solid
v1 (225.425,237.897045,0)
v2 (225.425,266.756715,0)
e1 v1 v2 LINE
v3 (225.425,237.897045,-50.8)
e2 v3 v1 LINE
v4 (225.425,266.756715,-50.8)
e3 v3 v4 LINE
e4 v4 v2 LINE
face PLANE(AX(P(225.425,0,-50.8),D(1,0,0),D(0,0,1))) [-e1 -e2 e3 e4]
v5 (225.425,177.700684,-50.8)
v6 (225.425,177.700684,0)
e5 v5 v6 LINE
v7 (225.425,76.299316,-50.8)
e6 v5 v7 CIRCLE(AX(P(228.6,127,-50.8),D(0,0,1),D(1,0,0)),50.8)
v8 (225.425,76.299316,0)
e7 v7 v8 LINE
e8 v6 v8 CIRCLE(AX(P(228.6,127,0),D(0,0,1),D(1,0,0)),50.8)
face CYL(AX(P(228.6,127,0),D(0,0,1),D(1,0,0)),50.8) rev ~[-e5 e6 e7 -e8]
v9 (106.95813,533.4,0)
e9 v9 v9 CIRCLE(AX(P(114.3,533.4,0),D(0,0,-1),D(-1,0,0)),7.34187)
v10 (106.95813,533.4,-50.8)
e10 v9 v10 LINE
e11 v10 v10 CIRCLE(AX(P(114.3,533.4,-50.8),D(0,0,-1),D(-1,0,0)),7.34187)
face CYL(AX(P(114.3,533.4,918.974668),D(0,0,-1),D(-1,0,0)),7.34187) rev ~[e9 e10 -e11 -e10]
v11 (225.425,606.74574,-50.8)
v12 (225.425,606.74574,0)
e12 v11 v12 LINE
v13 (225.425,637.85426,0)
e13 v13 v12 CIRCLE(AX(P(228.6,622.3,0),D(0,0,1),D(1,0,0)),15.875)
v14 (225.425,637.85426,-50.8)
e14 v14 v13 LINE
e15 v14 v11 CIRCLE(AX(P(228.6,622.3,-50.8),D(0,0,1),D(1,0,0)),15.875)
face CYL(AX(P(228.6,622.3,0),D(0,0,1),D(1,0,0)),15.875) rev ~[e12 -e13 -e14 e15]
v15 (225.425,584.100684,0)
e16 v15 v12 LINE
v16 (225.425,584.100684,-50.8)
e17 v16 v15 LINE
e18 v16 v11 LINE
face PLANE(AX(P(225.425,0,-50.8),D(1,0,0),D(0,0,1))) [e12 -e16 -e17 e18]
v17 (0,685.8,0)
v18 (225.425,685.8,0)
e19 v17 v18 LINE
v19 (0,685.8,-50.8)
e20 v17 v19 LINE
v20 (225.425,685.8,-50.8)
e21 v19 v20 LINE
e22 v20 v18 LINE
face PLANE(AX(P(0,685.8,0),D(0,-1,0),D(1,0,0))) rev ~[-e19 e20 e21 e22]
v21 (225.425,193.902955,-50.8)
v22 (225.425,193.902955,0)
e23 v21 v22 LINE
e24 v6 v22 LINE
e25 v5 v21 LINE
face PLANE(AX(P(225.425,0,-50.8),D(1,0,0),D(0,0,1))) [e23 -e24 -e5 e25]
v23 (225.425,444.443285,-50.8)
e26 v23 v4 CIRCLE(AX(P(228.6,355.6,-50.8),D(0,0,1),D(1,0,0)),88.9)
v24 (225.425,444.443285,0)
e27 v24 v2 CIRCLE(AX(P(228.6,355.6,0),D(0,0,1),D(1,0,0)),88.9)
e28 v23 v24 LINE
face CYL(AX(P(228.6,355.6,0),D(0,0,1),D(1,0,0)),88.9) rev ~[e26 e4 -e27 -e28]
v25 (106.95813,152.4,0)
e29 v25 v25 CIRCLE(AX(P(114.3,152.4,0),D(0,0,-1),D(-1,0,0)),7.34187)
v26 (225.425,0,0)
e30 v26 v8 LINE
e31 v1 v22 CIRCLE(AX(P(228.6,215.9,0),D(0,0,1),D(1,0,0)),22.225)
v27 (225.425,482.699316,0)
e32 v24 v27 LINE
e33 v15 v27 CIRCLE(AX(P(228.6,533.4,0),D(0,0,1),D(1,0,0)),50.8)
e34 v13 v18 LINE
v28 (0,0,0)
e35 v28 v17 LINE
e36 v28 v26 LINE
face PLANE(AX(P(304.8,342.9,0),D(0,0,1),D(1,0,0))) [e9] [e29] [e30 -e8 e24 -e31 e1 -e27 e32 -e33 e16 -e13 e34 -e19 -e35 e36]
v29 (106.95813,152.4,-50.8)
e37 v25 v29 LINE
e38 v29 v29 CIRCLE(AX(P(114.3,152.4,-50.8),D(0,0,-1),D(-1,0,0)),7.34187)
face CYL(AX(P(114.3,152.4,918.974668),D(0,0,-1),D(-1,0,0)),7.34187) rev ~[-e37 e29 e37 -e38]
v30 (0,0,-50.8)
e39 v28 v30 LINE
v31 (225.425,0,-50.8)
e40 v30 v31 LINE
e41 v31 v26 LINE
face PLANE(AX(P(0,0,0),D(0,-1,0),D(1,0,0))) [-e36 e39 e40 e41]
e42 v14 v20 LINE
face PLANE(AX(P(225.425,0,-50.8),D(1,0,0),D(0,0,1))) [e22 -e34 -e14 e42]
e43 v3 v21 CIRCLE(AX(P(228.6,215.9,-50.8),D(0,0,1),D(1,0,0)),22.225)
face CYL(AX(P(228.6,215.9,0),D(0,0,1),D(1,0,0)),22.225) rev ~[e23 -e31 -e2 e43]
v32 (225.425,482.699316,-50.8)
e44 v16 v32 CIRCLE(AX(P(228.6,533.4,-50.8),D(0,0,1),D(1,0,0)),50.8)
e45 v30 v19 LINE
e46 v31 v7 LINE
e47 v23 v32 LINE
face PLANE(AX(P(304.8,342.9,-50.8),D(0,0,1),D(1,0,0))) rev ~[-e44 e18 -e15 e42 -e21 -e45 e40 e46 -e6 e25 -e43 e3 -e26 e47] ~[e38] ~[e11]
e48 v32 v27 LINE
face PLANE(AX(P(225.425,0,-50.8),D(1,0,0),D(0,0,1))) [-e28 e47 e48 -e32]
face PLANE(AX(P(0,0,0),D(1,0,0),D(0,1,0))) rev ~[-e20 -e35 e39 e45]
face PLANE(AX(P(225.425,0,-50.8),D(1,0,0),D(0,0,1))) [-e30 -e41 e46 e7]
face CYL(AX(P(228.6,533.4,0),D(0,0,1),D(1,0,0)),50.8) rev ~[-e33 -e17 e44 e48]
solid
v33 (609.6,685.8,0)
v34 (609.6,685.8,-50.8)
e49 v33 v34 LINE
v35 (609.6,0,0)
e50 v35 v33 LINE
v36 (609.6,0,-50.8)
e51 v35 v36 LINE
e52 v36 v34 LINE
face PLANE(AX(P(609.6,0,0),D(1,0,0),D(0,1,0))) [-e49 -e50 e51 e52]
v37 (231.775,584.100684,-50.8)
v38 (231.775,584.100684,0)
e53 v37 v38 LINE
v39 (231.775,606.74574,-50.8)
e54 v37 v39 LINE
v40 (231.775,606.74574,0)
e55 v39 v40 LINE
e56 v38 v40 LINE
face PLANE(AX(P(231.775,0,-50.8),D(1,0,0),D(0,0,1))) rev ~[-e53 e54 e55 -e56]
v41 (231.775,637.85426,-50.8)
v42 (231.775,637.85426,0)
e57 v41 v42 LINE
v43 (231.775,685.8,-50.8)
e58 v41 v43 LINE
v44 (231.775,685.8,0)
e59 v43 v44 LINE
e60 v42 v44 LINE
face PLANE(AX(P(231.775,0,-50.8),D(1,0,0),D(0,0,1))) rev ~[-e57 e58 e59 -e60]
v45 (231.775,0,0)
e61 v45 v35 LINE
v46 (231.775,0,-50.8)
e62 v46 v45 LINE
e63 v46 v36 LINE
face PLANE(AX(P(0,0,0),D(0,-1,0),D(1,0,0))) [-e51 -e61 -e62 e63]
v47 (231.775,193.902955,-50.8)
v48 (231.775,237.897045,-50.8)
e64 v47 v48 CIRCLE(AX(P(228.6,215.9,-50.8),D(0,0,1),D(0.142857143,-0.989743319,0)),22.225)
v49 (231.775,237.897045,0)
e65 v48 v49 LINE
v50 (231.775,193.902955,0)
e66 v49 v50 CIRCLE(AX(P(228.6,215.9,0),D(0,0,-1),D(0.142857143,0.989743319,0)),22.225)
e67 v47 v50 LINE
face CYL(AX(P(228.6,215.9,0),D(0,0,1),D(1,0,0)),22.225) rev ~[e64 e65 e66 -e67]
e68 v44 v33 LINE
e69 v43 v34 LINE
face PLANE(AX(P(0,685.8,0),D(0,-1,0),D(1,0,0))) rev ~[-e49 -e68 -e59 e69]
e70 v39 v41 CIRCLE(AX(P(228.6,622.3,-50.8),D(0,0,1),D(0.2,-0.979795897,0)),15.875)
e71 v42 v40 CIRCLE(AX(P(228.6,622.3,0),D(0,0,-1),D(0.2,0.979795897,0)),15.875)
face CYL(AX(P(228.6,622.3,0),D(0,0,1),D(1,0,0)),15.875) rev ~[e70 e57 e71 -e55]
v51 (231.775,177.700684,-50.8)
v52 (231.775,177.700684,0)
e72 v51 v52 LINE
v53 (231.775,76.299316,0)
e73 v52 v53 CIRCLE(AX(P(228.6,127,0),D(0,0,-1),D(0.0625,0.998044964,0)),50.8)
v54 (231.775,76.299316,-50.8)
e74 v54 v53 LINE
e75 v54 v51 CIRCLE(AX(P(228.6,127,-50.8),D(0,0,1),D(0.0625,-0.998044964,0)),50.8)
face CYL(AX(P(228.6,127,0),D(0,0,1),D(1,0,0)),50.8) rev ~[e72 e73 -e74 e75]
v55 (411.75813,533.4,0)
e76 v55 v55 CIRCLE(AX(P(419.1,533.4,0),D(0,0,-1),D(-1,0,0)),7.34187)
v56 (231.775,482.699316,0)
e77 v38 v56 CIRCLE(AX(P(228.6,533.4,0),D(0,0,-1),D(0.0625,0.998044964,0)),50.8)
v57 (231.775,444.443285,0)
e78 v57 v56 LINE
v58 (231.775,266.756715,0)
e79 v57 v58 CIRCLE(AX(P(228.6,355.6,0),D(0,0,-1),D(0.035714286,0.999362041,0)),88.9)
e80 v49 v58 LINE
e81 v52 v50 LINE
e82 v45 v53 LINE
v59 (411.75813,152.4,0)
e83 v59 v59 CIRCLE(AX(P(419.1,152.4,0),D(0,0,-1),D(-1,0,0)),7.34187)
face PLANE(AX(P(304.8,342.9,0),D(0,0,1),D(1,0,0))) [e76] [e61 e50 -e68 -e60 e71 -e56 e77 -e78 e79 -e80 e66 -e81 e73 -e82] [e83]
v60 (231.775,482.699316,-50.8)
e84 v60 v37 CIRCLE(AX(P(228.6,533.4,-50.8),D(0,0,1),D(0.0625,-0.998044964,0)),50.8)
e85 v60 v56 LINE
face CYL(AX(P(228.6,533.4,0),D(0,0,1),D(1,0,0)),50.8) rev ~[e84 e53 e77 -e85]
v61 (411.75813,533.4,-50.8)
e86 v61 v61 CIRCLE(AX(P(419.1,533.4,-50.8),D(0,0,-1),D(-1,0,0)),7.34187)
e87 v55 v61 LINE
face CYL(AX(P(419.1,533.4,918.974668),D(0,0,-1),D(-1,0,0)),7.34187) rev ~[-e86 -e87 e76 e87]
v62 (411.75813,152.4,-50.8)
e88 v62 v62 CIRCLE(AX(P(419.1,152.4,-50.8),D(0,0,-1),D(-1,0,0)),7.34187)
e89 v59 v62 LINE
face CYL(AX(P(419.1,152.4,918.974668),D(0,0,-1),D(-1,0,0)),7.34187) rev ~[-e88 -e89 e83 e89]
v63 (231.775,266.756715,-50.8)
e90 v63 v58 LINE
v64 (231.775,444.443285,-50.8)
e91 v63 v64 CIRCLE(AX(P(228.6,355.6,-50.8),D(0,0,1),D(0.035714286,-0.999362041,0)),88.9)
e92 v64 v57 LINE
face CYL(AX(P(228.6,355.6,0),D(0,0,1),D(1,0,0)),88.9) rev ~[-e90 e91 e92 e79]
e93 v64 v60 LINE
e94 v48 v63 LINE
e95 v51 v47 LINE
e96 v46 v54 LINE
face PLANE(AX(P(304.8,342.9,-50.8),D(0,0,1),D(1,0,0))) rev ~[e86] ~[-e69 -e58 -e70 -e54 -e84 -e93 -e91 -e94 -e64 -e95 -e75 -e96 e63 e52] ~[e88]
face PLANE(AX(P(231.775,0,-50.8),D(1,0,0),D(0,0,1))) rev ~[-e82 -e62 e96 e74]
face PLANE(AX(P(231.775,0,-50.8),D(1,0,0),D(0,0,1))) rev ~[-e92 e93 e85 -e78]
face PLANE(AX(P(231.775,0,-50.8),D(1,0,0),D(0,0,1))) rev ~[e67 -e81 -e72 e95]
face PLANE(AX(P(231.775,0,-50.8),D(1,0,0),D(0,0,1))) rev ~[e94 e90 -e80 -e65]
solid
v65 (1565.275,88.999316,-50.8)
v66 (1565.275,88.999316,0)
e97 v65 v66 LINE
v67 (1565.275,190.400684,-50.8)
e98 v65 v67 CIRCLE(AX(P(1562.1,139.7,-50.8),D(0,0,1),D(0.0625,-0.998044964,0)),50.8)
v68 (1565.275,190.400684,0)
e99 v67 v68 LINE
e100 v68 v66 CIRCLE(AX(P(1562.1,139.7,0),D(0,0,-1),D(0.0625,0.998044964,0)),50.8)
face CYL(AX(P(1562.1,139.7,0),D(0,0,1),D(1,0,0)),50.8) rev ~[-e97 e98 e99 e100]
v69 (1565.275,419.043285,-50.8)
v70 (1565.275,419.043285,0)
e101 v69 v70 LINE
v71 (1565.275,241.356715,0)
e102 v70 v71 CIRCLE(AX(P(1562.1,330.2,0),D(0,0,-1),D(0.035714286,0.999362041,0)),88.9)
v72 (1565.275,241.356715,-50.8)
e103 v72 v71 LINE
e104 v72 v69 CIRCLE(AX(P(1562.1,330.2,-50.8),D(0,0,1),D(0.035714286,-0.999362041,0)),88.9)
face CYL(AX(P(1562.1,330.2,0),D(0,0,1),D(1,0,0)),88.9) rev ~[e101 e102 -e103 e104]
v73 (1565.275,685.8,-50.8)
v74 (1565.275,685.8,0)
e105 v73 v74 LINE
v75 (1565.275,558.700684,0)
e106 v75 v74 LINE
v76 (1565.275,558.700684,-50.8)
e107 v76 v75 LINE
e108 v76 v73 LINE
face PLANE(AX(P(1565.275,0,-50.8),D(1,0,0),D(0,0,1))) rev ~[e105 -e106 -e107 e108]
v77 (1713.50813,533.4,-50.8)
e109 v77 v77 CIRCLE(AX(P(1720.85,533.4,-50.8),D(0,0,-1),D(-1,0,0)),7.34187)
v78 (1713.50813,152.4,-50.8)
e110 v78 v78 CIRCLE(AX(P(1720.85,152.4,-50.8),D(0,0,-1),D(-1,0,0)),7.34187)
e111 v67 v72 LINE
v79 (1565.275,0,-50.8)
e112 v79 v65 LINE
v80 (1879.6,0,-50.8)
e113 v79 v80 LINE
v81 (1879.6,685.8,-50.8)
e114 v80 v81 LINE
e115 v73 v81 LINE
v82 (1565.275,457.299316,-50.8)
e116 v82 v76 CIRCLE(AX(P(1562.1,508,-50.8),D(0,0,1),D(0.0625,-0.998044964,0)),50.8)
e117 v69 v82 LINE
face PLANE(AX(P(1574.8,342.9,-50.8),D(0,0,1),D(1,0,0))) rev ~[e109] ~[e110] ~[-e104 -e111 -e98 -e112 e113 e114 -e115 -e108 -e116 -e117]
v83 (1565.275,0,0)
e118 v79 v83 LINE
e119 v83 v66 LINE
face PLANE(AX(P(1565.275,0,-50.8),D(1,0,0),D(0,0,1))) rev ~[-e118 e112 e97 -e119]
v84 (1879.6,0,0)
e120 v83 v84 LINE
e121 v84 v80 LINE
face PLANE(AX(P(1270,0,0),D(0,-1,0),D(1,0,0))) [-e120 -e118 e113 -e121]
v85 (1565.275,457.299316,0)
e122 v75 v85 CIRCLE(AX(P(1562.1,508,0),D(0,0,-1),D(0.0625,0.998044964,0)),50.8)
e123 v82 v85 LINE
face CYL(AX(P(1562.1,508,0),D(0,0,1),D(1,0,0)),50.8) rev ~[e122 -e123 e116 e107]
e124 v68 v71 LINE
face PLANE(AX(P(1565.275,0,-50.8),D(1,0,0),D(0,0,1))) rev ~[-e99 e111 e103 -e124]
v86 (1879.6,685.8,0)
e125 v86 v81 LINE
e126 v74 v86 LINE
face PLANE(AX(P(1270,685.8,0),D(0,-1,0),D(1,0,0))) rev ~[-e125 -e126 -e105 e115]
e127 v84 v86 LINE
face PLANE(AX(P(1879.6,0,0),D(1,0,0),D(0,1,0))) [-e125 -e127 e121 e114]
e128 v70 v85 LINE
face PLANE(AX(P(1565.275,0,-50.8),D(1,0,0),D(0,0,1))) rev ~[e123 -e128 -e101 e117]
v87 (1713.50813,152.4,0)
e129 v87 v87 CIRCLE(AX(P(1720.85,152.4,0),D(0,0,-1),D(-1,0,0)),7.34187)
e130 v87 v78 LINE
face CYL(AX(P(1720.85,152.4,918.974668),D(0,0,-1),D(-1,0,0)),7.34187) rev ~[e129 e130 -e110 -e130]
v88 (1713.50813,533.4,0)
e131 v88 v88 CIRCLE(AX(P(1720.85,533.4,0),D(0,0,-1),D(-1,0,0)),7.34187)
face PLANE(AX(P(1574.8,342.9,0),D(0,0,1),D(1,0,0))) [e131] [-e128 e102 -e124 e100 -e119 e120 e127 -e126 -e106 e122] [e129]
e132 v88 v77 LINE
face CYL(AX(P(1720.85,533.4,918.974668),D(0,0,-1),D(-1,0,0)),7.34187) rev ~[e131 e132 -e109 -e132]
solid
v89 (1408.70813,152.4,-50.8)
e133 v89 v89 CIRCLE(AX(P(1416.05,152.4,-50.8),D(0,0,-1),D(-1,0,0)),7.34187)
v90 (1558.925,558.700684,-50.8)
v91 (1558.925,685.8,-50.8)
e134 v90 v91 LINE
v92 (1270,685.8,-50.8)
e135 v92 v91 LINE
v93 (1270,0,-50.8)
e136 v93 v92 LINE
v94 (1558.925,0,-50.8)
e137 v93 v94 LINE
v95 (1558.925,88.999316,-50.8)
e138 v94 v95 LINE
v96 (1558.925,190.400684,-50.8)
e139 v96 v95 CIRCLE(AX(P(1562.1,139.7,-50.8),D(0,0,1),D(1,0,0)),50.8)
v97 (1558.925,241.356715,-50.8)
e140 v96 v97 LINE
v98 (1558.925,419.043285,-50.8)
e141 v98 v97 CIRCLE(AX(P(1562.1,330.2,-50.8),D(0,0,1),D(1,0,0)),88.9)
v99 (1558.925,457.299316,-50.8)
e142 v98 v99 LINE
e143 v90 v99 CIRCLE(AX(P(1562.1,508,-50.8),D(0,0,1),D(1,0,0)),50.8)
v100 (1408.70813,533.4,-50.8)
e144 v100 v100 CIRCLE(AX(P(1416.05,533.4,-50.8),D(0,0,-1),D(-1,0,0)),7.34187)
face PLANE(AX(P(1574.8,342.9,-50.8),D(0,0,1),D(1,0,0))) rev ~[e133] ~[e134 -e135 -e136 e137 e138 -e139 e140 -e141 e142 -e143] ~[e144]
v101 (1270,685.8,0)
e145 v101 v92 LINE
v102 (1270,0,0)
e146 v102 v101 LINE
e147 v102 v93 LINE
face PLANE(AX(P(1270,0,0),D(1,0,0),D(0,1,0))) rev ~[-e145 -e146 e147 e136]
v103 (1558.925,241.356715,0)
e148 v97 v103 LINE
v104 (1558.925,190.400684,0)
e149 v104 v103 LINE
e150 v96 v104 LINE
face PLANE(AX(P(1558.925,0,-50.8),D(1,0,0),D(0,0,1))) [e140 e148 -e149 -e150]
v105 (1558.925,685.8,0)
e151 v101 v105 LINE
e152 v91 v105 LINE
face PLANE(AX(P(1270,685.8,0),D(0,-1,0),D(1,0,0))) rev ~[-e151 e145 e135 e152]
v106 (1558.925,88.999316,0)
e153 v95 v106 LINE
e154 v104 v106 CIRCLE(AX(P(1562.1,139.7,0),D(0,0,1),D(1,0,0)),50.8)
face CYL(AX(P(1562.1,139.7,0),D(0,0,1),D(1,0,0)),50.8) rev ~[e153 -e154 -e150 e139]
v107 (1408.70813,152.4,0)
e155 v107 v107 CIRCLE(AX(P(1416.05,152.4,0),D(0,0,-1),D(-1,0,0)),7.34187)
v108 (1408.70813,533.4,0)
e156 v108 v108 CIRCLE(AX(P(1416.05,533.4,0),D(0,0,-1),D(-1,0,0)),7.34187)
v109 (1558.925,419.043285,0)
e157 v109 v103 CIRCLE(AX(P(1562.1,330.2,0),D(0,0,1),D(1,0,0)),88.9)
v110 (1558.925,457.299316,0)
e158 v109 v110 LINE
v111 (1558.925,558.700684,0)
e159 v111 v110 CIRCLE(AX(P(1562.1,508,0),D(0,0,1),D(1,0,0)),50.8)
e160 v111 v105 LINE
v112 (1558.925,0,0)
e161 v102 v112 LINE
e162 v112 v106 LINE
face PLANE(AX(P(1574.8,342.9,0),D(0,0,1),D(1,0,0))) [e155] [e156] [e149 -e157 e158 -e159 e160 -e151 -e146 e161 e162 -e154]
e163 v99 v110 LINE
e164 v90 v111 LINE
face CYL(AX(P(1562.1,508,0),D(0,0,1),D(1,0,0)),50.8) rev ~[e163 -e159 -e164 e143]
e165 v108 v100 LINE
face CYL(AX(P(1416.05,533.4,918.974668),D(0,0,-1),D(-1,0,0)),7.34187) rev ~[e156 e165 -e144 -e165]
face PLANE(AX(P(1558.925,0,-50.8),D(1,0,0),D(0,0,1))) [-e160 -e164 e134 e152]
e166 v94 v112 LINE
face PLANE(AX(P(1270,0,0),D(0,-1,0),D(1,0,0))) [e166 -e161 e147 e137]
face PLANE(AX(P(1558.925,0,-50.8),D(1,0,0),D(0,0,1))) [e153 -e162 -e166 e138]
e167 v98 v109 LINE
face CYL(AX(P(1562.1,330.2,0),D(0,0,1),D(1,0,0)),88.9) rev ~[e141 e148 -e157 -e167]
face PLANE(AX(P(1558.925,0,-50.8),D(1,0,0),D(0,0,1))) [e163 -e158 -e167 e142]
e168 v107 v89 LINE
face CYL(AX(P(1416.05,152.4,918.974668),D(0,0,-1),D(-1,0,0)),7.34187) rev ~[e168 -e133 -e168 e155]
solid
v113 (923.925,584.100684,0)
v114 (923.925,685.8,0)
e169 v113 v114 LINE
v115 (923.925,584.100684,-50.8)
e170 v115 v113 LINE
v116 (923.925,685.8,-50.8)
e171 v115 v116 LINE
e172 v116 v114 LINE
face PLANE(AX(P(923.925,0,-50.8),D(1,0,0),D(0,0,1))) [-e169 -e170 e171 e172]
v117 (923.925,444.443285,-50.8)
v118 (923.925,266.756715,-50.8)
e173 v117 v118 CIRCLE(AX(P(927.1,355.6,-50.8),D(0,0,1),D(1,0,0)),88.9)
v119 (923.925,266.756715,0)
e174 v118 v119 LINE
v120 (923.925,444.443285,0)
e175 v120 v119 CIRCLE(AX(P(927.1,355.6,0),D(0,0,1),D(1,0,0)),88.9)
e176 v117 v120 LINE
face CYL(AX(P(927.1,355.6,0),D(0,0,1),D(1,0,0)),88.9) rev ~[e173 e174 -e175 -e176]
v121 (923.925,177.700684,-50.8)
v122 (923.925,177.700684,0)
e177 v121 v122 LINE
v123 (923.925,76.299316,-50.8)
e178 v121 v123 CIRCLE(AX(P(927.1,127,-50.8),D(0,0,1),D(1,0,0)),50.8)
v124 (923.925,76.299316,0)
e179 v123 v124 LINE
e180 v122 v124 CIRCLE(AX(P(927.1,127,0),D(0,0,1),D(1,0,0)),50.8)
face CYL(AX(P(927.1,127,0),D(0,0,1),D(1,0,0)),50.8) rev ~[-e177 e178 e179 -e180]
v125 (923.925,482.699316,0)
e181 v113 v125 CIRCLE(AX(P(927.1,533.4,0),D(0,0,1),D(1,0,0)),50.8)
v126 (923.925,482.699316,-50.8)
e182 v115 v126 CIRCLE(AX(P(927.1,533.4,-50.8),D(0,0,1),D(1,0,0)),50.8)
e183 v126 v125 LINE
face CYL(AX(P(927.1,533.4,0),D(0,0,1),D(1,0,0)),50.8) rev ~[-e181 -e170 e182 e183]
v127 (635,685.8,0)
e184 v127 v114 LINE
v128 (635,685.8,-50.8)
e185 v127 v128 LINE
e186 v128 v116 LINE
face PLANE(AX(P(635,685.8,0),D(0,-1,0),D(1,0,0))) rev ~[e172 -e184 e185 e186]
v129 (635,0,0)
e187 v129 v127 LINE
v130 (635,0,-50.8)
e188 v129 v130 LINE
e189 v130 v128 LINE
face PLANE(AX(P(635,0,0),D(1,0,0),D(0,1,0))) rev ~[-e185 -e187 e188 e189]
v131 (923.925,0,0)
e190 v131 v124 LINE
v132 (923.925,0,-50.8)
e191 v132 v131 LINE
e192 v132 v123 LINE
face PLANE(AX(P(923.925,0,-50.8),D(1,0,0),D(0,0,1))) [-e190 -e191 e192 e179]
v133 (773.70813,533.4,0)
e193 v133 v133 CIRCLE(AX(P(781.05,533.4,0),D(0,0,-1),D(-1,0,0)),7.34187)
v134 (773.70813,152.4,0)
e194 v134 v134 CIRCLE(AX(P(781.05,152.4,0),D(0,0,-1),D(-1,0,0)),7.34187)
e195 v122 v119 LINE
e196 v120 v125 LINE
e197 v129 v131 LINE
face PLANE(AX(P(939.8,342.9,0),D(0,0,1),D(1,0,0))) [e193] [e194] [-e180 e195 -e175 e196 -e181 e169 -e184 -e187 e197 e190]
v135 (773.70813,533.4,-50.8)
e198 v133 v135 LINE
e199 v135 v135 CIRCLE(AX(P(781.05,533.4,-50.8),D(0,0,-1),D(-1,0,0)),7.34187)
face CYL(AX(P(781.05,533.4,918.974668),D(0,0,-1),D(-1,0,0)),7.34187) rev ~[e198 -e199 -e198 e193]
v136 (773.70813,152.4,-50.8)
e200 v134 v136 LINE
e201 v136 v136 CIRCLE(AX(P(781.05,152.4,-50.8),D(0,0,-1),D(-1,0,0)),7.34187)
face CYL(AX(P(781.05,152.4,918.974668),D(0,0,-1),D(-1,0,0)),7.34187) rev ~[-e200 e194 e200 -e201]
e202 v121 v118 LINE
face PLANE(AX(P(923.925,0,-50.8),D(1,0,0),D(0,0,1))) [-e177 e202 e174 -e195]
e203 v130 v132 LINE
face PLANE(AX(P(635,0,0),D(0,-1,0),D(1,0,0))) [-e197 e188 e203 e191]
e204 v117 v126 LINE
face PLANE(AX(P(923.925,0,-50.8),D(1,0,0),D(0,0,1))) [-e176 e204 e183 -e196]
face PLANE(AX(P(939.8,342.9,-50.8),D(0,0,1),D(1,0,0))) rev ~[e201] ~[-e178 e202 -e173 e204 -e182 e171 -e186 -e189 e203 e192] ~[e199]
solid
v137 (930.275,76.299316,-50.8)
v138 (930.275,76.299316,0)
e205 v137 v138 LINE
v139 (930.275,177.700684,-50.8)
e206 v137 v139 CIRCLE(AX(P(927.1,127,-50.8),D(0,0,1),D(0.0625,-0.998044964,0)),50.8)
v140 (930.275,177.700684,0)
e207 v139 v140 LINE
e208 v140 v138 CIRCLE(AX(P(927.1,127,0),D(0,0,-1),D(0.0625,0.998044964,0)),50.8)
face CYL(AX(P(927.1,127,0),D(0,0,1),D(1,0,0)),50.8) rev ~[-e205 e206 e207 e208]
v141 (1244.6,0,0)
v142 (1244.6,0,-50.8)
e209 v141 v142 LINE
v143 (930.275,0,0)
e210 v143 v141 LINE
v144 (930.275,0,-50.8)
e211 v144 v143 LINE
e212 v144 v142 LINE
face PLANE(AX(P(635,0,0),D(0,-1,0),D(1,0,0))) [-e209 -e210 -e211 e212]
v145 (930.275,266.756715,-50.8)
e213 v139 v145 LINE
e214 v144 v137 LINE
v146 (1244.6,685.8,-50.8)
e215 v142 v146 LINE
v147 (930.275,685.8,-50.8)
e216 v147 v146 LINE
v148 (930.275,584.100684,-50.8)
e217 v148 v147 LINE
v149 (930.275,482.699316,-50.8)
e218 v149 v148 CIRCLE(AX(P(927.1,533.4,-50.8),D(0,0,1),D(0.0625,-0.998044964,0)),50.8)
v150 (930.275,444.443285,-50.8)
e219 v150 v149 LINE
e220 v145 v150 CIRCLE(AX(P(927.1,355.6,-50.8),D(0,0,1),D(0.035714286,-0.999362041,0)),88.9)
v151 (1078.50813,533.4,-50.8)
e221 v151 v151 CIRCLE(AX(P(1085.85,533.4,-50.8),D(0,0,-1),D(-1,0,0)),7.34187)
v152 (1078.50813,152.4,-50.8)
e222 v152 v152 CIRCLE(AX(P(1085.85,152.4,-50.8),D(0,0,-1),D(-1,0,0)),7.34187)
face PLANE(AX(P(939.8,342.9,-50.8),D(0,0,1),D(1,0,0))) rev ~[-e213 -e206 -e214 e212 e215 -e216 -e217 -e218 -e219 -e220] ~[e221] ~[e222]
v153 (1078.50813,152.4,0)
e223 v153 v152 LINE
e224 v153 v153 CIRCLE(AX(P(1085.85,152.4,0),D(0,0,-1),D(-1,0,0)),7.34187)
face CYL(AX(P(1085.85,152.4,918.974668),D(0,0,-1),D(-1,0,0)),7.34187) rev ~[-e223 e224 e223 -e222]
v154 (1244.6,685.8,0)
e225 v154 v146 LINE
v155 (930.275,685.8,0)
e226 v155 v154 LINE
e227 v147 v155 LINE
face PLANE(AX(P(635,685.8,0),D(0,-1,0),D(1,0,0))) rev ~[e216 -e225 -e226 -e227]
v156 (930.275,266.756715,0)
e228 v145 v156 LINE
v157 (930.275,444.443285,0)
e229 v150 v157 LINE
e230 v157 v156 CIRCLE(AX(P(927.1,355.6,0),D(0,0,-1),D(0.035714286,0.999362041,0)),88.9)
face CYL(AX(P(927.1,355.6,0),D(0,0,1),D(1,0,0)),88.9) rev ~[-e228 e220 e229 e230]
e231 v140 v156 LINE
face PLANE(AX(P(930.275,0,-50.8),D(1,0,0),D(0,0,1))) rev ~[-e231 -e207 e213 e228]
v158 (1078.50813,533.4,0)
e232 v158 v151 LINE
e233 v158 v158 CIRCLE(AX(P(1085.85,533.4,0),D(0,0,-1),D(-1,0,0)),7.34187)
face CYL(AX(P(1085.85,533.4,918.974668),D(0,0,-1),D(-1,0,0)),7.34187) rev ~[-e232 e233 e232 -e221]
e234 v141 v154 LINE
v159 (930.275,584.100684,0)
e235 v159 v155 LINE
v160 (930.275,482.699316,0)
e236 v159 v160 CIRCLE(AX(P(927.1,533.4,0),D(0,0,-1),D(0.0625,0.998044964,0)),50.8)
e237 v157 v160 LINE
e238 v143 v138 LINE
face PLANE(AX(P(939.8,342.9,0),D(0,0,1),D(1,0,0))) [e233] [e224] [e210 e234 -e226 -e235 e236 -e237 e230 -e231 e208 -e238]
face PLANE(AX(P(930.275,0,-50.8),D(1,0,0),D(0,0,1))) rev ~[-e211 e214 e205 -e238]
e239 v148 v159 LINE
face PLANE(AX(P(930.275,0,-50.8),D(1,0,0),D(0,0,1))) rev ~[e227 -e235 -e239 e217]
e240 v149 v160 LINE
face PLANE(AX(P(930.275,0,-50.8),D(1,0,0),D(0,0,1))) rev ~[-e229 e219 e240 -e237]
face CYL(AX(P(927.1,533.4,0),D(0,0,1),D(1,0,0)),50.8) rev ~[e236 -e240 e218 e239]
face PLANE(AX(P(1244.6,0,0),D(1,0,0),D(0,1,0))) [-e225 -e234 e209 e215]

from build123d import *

# Parameters (mm, degrees)
F0_W      = 609.6
F0_H      = 685.8
F1_DEPTH  = 50.8
F2_R      = 50.8
F2_R_2    = 88.9
F2_R_3    = 15.875
F2_R_4    = 22.225
F3_DEPTH  = 50.801
F4_DEPTH  = 635
F10_DEPTH = 685.8
F11_R     = 50.8
F11_R_2   = 88.9
F12_DEPTH = 50.8
F13_DEPTH = 685.8
F14_R     = 50.8
F14_R_2   = 88.9
F15_DEPTH = 50.8
F16_W     = 6.35
F16_H     = 50.8
F17_DEPTH = 685.801
F18_D     = 14.68374
F19_D     = 14.68374
F20_D     = 14.68374


# Not quite as in the source:
# - a feature names something its author has since deleted; it is built from what else it names


with BuildPart() as f1:
    # F0 (on Top) → F1 (new body)
    with BuildSketch(Plane.XY):
        with Locations((304.8, 342.9)):
            Rectangle(F0_W, F0_H)
    extrude(amount=-F1_DEPTH)

    # F2 (on face) → F3 (cut, through all)
    with BuildSketch(Plane.XY):
        with Locations((228.6, 533.4)):
            Circle(F2_R)
        with Locations((228.6, 127)):
            Circle(F2_R)
        with Locations((228.6, 355.6)):
            Circle(F2_R_2)
        with Locations((228.6, 622.3)):
            Circle(F2_R_3)
        with Locations((228.6, 215.9)):
            Circle(F2_R_4)
    extrude(amount=-F3_DEPTH, mode=Mode.SUBTRACT)


with BuildPart() as f4:
    # F4 (new): a face of the model
    f4_faces = [f1.part.faces().sort_by_distance(p)[0] for p in [
        (609.6, 342.9, -25.4),
    ]]
    extrude(f4_faces, amount=F4_DEPTH)


with BuildPart() as f6_1:
    # F6: copy of F1
    add(f1.part)


with BuildPart() as f7_1:
    # F7: copy of F1
    add(f1.part)


with BuildPart() as f6_1_1:
    # F8: moved
    add(f6_1.part.moved(Location((635, 0, 0))))

    # F10 (add, through all): a face of the model
    f10_faces = [f6_1_1.faces().sort_by_distance(p)[0] for p in [
        (939.8, 685.8, -25.4),
    ]]
    extrude(f10_faces, amount=-F10_DEPTH)

    # F11 (on face) → F12 (cut, through all)
    with BuildSketch(Plane.XY):
        with Locations((927.1, 533.4)):
            Circle(F11_R)
        with Locations((927.1, 355.6)):
            Circle(F11_R_2)
        with Locations((927.1, 127)):
            Circle(F11_R)
    extrude(amount=-F12_DEPTH, mode=Mode.SUBTRACT)


with BuildPart() as f7_1_1:
    # F9: moved
    add(f7_1.part.moved(Location((1270, 0, 0))))

    # F13 (add, through all): a face of the model
    f13_faces = [f7_1_1.faces().sort_by_distance(p)[0] for p in [
        (1574.8, 685.8, -25.4),
    ]]
    extrude(f13_faces, amount=-F13_DEPTH)

    # F14 (on face) → F15 (cut, through all)
    with BuildSketch(Plane.XY):
        with Locations((1562.1, 508)):
            Circle(F14_R)
        with Locations((1562.1, 330.2)):
            Circle(F14_R_2)
        with Locations((1562.1, 139.7)):
            Circle(F14_R)
    extrude(amount=-F15_DEPTH, mode=Mode.SUBTRACT)


with BuildPart() as f17_tool:
    # F16 (on face) → F17 (new body, through all)
    with BuildSketch(Plane.XZ):
        with Locations((228.6, -25.4)):
            Rectangle(F16_W, F16_H)
        with Locations((927.1, -25.4)):
            Rectangle(F16_W, F16_H)
        with Locations((1562.1, -25.4)):
            Rectangle(F16_W, F16_H)
    extrude(amount=-F17_DEPTH)


with BuildPart() as f1_1:
    add(f1.part)

    # F17: cut by f17_tool
    add(f17_tool.part, mode=Mode.SUBTRACT)

    # F18 (through all)
    with Locations(Plane.XY):
        with Locations((114.3, 533.4), (114.3, 152.4), (419.1, 533.4), (419.1, 152.4)):
            Hole(F18_D / 2)


with BuildPart() as f6_1_2:
    add(f6_1_1.part)

    # F17: cut by f17_tool
    add(f17_tool.part, mode=Mode.SUBTRACT)

    # F19 (through all)
    with Locations(Plane.XY):
        with Locations((781.05, 533.4), (1085.85, 533.4), (1085.85, 152.4), (781.05, 152.4)):
            Hole(F19_D / 2)


with BuildPart() as f7_1_2:
    add(f7_1_1.part)

    # F17: cut by f17_tool
    add(f17_tool.part, mode=Mode.SUBTRACT)

    # F20 (through all)
    with Locations(Plane.XY):
        with Locations((1416.05, 533.4), (1720.85, 533.4), (1416.05, 152.4), (1720.85, 152.4)):
            Hole(F20_D / 2)


solid = Compound([f1_1.part, f6_1_2.part, f7_1_2.part])
